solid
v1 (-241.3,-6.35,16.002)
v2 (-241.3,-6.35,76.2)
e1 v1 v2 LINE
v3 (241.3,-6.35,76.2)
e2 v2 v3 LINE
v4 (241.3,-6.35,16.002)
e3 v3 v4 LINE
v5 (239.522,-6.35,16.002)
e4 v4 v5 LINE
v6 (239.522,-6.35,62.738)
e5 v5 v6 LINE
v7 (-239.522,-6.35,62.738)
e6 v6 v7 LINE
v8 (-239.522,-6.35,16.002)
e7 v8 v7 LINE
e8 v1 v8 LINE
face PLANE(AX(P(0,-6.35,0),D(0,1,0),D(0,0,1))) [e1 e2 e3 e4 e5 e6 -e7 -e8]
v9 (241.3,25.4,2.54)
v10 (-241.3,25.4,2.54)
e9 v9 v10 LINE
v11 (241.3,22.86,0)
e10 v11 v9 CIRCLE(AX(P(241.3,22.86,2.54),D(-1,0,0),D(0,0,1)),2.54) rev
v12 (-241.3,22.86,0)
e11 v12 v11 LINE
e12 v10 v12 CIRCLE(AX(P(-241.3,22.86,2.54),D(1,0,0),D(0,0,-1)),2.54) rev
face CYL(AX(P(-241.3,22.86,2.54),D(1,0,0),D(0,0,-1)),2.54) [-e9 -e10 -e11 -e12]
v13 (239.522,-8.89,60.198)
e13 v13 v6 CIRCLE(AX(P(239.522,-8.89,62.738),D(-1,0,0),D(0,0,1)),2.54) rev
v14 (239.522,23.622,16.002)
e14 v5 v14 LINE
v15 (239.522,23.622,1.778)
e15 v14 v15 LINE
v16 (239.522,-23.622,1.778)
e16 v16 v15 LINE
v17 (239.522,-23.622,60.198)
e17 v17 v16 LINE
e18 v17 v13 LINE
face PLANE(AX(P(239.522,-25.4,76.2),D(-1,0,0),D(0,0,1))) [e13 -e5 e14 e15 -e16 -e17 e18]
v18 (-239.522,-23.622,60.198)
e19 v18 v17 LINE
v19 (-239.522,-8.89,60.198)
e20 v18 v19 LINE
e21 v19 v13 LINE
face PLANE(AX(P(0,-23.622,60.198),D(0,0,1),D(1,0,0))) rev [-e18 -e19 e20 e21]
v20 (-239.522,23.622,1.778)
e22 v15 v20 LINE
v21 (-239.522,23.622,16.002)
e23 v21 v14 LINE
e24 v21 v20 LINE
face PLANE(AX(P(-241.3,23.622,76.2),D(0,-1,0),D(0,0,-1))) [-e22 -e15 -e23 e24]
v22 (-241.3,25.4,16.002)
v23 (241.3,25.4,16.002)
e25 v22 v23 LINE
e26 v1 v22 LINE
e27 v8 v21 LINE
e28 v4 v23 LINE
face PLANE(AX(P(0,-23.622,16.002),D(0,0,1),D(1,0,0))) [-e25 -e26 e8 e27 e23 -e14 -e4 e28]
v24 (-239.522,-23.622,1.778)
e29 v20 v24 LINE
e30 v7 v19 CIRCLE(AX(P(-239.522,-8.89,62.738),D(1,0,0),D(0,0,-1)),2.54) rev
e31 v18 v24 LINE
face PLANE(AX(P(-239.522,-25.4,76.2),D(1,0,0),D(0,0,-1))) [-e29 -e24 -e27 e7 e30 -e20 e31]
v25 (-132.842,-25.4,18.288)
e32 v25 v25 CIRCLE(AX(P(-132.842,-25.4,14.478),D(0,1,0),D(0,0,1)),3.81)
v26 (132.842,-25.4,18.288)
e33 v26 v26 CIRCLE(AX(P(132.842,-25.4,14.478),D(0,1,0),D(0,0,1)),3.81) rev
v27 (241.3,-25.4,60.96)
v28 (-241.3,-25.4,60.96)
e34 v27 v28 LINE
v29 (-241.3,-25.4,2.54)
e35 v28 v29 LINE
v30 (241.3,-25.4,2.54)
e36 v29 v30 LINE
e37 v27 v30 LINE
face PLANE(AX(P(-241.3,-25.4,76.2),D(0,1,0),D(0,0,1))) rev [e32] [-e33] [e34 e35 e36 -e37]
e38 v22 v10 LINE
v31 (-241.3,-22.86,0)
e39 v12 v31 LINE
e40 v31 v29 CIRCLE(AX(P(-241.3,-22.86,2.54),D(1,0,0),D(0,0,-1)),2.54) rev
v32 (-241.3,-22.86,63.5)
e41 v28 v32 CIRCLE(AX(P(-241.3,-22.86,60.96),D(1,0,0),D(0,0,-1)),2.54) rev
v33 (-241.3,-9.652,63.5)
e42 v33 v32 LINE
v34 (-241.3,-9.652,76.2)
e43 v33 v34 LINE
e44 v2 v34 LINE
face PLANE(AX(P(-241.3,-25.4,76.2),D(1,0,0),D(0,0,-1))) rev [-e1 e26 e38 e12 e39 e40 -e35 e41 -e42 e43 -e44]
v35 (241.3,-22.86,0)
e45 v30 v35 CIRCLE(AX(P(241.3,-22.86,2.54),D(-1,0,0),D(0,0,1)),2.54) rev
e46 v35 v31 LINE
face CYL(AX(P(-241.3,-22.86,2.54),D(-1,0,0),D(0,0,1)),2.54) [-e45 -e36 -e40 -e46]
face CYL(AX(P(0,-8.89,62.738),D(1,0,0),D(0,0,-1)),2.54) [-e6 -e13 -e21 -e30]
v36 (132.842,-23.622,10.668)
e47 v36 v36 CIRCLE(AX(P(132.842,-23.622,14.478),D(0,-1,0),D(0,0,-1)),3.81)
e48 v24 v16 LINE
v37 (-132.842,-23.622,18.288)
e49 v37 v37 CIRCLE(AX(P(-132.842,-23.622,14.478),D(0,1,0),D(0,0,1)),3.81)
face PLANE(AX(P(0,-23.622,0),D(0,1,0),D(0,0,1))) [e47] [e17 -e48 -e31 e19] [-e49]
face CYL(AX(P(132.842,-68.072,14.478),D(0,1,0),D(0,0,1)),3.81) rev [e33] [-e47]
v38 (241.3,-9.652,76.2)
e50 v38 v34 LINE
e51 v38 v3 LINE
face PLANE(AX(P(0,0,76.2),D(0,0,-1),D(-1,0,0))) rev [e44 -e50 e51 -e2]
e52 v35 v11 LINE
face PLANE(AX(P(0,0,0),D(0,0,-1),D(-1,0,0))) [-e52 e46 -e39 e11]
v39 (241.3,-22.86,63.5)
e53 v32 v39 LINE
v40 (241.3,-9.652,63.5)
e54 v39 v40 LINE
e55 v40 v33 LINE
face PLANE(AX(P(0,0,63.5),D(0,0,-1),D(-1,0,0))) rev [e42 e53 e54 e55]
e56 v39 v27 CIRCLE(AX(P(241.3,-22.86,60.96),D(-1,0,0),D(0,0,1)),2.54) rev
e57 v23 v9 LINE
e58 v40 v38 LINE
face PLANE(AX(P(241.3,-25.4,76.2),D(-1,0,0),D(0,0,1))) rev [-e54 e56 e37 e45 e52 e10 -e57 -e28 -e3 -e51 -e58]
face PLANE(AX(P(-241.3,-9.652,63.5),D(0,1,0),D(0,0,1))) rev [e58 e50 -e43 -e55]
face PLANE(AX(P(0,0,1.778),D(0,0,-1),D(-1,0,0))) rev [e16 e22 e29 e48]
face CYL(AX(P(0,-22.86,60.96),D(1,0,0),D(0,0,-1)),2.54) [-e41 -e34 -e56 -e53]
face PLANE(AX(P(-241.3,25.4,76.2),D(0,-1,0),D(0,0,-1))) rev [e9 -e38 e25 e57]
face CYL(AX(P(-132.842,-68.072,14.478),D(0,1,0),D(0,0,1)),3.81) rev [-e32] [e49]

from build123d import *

# Parameters (mm, degrees)
SKETCH1_W           = 482.6
SKETCH1_H           = 50.8
BOSS_EXTRUDE1_DEPTH = 76.2
CUT_EXTRUDE2_DEPTH  = 49.022
SKETCH3_W           = 482.6
SKETCH3_H           = 16.002
CUT_EXTRUDE3_DEPTH  = 31.75
SKETCH4_W           = 482.6
SKETCH4_H           = 15.748
CUT_EXTRUDE4_DEPTH  = 12.7
SHELL2_START        = -23.622
SHELL2_OUTLINE_W    = 479.044
SHELL2_OUTLINE_H    = 14.224
SHELL2_DEPTH        = 47.244
SKETCH5_W           = 1.778
SKETCH5_H           = 17.272
BOSS_EXTRUDE2_DEPTH = 44.45
FILLET1_R           = 2.54
SKETCH6_R           = 3.81
CUT_EXTRUDE5_DEPTH  = 44.45


# Read off the part's stored shape, not the designer's step: Shell2
with BuildPart() as part:
    # Sketch1 → Boss-Extrude1 (new body)
    with BuildSketch(Plane.XY):
        Rectangle(SKETCH1_W, SKETCH1_H)
    extrude(amount=BOSS_EXTRUDE1_DEPTH)

    # Sketch2 → Cut-Extrude2 (cut)
    with BuildSketch(Plane(origin=(0, 25.4, 0), x_dir=(1, 0, 0), z_dir=(0, 1, 0))):
        Polygon((241.3, -16.002), (-241.3, -16.002), (-241.3, -38.1), (-241.3, -60.198), (241.3, -60.198), align=None)
    extrude(amount=-CUT_EXTRUDE2_DEPTH, mode=Mode.SUBTRACT)

    # Sketch3 → Cut-Extrude3 (cut)
    with BuildSketch(Plane(origin=(0, 25.4, 0), x_dir=(1, 0, 0), z_dir=(0, 1, 0))):
        with Locations((0, -68.199)):
            Rectangle(SKETCH3_W, SKETCH3_H)
    extrude(amount=-CUT_EXTRUDE3_DEPTH, mode=Mode.SUBTRACT)

    # Sketch4 → Cut-Extrude4 (cut)
    with BuildSketch(Plane.XY.offset(76.2)):
        with Locations((0, -17.526)):
            Rectangle(SKETCH4_W, SKETCH4_H)
    extrude(amount=-CUT_EXTRUDE4_DEPTH, mode=Mode.SUBTRACT)

    # Shell2 outline → Shell2 (cut)
    with BuildSketch(Plane(origin=(0, 0, 0), x_dir=(1, 0, 0), z_dir=(0, 1, 0)).offset(SHELL2_START)):
        with Locations((0, -8.89)):
            Rectangle(SHELL2_OUTLINE_W, SHELL2_OUTLINE_H)
    extrude(amount=SHELL2_DEPTH, mode=Mode.SUBTRACT)

    # Sketch5 → Boss-Extrude2 (add)
    with BuildSketch(Plane(origin=(0, 0, 60.198), x_dir=(-1, 0, 0), z_dir=(0, 0, -1))):
        with Locations((240.411, -14.986)):
            Rectangle(SKETCH5_W, SKETCH5_H)
        with Locations((-240.411, -14.986)):
            Rectangle(SKETCH5_W, SKETCH5_H)
    extrude(amount=BOSS_EXTRUDE2_DEPTH)

    # Fillet1
    fillet1_edges = [part.edges().sort_by_distance(p)[0] for p in [
        (0, -25.4, 0),
        (0, -25.4, 63.5),
        (0, 25.4, 0),
        (0, -6.35, 60.198),
    ]]
    fillet(fillet1_edges, radius=FILLET1_R)

    # Sketch6 → Cut-Extrude5 (cut)
    with BuildSketch(Plane(origin=(0, -23.622, 0), x_dir=(1, 0, 0), z_dir=(0, 1, 0))):
        with Locations(Location((-132.842, -14.478, 0), (0, 0, 270))):
            Circle(SKETCH6_R)
        with Locations(Location((132.842, -14.478, 0), (0, 0, 270))):
            Circle(SKETCH6_R)
    extrude(amount=-CUT_EXTRUDE5_DEPTH, mode=Mode.SUBTRACT)


solid = part.part
